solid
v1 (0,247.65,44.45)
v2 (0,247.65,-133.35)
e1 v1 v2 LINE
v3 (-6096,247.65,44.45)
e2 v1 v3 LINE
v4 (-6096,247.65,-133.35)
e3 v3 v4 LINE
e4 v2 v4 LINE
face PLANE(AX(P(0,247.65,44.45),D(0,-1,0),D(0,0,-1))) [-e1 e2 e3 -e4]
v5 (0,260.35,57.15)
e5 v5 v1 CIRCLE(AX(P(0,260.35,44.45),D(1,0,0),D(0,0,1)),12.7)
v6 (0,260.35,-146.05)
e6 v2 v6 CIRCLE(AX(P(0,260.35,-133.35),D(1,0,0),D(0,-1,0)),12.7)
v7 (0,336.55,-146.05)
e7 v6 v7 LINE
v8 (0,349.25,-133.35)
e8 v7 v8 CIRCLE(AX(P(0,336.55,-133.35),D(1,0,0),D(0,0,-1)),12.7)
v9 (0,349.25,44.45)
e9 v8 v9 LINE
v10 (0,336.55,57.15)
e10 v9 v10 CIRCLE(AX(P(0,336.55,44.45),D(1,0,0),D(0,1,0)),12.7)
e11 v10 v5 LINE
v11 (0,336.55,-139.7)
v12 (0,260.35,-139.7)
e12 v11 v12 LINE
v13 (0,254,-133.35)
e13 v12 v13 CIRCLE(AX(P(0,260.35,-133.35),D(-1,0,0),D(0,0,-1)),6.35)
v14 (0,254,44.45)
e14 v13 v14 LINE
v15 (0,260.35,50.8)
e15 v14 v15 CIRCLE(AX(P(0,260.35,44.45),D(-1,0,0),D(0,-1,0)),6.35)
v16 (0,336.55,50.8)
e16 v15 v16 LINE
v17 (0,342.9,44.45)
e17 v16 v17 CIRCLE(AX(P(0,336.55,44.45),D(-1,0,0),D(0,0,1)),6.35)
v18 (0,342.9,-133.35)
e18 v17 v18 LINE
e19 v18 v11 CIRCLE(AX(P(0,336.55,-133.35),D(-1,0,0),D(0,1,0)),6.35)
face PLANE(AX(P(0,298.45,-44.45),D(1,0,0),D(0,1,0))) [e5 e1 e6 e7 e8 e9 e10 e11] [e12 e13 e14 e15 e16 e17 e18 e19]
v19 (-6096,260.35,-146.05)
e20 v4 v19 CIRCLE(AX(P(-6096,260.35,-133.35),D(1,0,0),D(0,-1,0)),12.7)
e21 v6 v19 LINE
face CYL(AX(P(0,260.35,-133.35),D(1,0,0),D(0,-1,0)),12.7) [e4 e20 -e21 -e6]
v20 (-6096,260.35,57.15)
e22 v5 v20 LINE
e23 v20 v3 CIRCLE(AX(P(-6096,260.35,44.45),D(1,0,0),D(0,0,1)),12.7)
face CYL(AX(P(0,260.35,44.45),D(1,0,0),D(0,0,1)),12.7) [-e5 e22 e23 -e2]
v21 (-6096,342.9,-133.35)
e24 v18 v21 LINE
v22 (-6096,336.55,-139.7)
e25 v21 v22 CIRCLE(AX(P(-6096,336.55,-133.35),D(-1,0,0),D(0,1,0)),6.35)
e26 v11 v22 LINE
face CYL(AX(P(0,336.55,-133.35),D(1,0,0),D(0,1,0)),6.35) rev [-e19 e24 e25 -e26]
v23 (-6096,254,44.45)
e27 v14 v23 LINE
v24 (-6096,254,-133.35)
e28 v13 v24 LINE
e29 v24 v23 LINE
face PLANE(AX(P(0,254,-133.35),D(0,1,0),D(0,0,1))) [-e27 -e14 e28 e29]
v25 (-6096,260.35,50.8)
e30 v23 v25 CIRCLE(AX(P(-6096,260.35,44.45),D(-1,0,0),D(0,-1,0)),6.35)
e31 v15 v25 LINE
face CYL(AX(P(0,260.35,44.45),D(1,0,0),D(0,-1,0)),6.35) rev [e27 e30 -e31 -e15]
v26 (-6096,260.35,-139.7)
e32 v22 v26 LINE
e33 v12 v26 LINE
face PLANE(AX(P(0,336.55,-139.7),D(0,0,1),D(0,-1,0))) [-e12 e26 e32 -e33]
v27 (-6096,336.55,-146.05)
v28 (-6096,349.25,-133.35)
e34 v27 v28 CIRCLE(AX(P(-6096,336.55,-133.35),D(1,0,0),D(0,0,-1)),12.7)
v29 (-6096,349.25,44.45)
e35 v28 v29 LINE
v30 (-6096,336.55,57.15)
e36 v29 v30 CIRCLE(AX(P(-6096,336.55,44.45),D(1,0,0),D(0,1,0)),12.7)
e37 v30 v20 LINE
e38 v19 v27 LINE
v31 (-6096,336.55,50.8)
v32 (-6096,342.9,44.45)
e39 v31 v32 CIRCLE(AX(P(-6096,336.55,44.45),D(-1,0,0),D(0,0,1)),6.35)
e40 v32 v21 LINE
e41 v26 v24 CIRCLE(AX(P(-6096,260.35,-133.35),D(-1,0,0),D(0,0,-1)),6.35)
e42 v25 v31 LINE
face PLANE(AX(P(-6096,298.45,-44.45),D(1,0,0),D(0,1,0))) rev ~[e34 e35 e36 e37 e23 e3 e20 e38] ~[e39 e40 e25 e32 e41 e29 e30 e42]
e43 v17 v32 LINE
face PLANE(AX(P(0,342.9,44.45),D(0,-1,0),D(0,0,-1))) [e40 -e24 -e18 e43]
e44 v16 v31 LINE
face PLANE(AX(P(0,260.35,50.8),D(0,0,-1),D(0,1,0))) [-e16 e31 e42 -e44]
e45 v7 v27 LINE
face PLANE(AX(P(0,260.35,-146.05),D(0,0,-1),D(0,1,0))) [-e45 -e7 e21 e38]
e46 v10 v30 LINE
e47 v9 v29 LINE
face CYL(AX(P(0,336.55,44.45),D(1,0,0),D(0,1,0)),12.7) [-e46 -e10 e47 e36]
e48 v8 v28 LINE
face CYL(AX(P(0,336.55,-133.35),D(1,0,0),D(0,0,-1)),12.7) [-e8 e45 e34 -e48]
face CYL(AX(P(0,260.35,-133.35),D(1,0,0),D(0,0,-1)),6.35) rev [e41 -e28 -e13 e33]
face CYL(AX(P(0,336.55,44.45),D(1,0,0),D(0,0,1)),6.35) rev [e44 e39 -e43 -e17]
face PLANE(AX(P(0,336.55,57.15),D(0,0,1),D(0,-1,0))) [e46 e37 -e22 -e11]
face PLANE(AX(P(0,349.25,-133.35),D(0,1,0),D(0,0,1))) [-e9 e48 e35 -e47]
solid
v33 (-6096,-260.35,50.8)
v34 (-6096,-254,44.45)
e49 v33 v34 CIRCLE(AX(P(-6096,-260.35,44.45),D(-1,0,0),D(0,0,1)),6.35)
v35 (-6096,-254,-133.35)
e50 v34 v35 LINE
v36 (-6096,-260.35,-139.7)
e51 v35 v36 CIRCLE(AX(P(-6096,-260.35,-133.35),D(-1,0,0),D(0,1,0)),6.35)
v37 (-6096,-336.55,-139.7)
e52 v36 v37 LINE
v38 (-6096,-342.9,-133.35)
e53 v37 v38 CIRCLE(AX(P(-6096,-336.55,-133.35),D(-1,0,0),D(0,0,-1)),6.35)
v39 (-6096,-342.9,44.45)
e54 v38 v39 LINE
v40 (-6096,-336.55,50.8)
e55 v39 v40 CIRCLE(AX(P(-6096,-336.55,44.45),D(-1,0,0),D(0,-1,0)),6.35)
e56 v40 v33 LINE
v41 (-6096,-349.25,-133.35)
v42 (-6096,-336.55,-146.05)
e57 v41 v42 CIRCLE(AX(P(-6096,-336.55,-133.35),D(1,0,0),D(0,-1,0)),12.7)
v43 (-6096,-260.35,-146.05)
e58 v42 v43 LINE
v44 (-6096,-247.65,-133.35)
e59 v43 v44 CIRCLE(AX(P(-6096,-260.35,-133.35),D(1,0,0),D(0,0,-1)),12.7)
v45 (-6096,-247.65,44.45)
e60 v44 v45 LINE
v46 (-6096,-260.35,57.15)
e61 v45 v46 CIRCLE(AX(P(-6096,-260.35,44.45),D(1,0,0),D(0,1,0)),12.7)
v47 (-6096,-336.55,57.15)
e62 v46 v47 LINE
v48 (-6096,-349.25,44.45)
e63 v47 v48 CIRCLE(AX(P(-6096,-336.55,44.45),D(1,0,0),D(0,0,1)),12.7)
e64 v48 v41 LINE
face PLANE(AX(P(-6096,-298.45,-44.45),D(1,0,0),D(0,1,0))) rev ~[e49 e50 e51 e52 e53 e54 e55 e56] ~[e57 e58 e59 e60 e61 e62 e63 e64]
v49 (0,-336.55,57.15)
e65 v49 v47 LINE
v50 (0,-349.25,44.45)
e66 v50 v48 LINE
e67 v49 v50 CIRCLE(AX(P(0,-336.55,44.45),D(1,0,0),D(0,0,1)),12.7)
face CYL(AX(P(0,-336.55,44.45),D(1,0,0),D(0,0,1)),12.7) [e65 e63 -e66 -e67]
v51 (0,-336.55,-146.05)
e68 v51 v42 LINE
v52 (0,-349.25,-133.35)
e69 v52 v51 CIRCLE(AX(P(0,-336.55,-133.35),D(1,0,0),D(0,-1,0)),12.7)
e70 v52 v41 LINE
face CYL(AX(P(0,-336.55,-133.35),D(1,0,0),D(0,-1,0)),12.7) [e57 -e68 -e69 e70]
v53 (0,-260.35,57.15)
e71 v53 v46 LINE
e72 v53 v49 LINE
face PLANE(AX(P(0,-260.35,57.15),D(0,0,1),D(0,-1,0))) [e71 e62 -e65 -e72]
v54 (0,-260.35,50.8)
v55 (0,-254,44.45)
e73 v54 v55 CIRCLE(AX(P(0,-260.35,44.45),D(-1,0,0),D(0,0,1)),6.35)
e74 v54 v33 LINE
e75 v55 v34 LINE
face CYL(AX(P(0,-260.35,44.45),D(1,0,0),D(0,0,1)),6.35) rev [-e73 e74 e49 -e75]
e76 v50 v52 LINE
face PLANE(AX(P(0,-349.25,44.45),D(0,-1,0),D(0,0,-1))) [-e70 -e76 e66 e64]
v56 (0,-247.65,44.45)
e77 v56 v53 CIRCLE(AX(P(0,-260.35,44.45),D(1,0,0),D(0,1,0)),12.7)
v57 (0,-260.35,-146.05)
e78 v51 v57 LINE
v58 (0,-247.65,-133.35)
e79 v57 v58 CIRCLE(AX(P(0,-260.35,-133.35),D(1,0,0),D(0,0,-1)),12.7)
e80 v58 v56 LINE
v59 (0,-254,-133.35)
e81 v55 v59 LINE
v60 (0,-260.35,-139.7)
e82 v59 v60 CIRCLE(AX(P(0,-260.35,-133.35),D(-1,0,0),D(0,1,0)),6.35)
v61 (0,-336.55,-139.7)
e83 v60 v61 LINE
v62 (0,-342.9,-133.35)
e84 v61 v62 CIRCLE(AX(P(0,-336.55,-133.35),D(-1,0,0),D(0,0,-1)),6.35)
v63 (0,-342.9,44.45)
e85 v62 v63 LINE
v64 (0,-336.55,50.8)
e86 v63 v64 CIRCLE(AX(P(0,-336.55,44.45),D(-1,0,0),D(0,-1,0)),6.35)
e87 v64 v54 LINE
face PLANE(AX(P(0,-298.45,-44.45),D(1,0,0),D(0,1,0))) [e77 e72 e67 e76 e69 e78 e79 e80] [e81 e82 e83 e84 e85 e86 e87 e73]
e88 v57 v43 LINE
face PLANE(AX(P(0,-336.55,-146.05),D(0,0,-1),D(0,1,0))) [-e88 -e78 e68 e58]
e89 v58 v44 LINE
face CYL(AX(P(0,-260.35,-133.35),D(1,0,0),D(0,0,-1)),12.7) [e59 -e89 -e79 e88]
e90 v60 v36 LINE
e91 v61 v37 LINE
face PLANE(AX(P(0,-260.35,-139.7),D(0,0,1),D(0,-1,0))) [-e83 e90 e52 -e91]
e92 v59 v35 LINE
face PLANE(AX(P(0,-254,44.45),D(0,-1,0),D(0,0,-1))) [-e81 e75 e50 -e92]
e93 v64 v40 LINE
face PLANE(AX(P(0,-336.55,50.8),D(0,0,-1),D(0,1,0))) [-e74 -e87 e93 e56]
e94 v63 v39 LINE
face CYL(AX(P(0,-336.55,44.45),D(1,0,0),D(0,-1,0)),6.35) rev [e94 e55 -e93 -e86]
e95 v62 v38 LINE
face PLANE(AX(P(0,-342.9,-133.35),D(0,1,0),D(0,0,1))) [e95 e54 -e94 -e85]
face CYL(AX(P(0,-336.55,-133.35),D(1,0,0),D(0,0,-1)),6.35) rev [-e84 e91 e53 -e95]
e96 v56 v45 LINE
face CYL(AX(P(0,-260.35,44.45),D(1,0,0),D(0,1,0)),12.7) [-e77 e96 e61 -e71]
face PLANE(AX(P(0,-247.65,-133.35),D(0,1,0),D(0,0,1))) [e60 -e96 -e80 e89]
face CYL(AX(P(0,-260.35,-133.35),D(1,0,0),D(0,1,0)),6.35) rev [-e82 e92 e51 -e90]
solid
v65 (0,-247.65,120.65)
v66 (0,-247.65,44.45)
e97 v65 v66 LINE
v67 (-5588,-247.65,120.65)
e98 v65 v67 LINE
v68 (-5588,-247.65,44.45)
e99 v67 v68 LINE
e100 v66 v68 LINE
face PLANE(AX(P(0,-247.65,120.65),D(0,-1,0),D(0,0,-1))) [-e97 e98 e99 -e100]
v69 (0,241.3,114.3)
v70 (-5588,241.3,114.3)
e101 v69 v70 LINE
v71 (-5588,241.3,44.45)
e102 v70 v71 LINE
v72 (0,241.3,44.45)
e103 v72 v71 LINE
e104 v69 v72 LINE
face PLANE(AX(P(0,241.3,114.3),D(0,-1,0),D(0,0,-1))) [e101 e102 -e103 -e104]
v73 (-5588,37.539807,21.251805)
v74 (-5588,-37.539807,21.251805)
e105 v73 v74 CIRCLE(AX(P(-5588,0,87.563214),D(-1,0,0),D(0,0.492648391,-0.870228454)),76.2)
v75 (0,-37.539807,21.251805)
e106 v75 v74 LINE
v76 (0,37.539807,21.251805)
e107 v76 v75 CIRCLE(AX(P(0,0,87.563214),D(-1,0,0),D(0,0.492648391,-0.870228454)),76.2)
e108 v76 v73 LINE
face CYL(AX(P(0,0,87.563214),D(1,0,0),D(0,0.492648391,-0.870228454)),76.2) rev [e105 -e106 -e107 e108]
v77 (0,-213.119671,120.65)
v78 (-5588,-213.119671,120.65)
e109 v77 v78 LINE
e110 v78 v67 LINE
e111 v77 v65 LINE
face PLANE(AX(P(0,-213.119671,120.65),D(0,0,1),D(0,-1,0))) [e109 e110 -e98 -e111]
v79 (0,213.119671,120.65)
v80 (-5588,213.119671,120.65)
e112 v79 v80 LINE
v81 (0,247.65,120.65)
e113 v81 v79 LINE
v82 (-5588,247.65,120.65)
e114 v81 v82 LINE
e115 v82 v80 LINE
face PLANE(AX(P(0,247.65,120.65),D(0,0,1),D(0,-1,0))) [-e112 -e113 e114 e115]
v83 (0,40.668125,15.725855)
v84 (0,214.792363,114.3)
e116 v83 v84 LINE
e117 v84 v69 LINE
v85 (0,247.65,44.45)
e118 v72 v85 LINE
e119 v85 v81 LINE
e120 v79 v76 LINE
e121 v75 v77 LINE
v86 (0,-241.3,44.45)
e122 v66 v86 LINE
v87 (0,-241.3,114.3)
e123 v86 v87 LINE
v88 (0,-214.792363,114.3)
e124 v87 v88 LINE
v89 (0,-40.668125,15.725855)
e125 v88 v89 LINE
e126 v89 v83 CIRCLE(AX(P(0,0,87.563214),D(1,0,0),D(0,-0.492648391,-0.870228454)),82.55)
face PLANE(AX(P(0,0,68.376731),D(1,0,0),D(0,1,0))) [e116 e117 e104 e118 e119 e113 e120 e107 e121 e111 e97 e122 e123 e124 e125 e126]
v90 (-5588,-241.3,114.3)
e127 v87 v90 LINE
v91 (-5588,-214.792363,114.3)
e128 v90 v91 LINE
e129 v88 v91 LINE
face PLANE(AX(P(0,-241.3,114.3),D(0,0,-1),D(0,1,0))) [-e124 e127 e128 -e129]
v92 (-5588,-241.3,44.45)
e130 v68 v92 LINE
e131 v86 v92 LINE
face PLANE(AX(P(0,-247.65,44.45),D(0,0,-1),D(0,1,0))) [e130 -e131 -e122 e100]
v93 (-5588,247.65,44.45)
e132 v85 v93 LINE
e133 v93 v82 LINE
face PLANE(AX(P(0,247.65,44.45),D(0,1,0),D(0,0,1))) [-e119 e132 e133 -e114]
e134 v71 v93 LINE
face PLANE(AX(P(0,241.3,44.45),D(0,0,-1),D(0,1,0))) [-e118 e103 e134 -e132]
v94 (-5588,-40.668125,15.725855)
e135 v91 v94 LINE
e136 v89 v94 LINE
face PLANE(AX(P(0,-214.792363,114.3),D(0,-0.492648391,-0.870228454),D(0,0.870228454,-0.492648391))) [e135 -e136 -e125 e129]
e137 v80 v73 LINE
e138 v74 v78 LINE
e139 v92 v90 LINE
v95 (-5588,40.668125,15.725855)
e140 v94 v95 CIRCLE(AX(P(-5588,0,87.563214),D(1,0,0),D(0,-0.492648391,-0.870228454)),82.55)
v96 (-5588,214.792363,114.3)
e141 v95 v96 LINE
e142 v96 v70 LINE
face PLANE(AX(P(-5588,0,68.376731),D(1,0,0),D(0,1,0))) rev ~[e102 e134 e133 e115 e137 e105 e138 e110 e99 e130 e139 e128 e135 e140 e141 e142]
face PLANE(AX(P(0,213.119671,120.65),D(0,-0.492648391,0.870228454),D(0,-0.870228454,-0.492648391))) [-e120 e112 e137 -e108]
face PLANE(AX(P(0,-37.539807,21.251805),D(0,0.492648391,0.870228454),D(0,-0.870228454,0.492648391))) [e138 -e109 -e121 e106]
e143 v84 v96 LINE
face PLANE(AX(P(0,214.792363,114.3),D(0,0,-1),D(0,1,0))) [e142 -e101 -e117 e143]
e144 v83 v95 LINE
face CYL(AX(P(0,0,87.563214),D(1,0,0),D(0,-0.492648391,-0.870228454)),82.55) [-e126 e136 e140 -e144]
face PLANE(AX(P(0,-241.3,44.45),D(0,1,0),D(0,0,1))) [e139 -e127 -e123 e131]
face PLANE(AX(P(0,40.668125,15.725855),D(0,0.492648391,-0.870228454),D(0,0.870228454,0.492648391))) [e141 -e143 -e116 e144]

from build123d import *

# Parameters (mm, degrees)
F1_DEPTH = 6096
F2_DEPTH = 5588


# Not quite as in the source:
# - a feature names something its author has since deleted; it is built from what else it names


with BuildPart() as f1:
    # F0 (on Right) → F1 (new body)
    with BuildSketch(Plane.YZ):
        with BuildLine():
            Line((-278.751844046, 57.15), (-336.55, 57.15))
            ThreePointArc((-336.55, 57.15), (-345.5302561211, 53.4302561211), (-349.25, 44.45))
            Line((-349.25, 44.45), (-349.25, -133.35))
            ThreePointArc((-349.25, -133.35), (-345.5302561211, -142.3302561211), (-336.55, -146.05))
            Line((-336.55, -146.05), (-260.35, -146.05))
            ThreePointArc((-260.35, -146.05), (-251.3697438789, -142.3302561211), (-247.65, -133.35))
            Line((-247.65, -133.35), (-247.65, 44.45))
            ThreePointArc((-247.65, 44.45), (-251.3697438789, 53.4302561211), (-260.35, 57.15))
            Line((-260.35, 57.15), (-268.1402802436, 57.15))
            Line((-268.1402802436, 57.15), (-269.3472818438, 57.15))
            Line((-269.3472818438, 57.15), (-278.751844046, 57.15))
        make_face()
        with BuildLine():
            ThreePointArc((-342.9, 44.45), (-341.0401280605, 48.9401280605), (-336.55, 50.8))
            Line((-336.55, 50.8), (-260.35, 50.8))
            ThreePointArc((-260.35, 50.8), (-255.8598719395, 48.9401280605), (-254, 44.45))
            Line((-254, 44.45), (-254, -133.35))
            ThreePointArc((-254, -133.35), (-255.8598719395, -137.8401280605), (-260.35, -139.7))
            Line((-260.35, -139.7), (-336.55, -139.7))
            ThreePointArc((-336.55, -139.7), (-341.0401280605, -137.8401280605), (-342.9, -133.35))
            Line((-342.9, -133.35), (-342.9, 44.45))
        make_face(mode=Mode.SUBTRACT)
    extrude(amount=-F1_DEPTH)


with BuildPart() as f1b:
    # F0 (on Right) → F1, piece 2 (new body)
    with BuildSketch(Plane.YZ):
        with BuildLine():
            ThreePointArc((260.35, 57.15), (251.3697438789, 53.4302561211), (247.65, 44.45))
            Line((247.65, 44.45), (247.65, -133.35))
            ThreePointArc((247.65, -133.35), (251.3697438789, -142.3302561211), (260.35, -146.05))
            Line((260.35, -146.05), (336.55, -146.05))
            ThreePointArc((336.55, -146.05), (345.5302561211, -142.3302561211), (349.25, -133.35))
            Line((349.25, -133.35), (349.25, 44.45))
            ThreePointArc((349.25, 44.45), (345.5302561211, 53.4302561211), (336.55, 57.15))
            Line((336.55, 57.15), (260.35, 57.15))
        make_face()
        with BuildLine():
            Line((260.35, 50.8), (336.55, 50.8))
            ThreePointArc((336.55, 50.8), (341.0401280605, 48.9401280605), (342.9, 44.45))
            Line((342.9, 44.45), (342.9, -133.35))
            ThreePointArc((342.9, -133.35), (341.0401280605, -137.8401280605), (336.55, -139.7))
            Line((336.55, -139.7), (260.35, -139.7))
            ThreePointArc((260.35, -139.7), (255.8598719395, -137.8401280605), (254, -133.35))
            Line((254, -133.35), (254, 44.45))
            ThreePointArc((254, 44.45), (255.8598719395, 48.9401280605), (260.35, 50.8))
        make_face(mode=Mode.SUBTRACT)
    extrude(amount=-F1_DEPTH)


with BuildPart() as f2:
    # F0 (on Right) → F2 (new body)
    with BuildSketch(Plane.YZ):
        with BuildLine():
            Line((-247.65, 120.65), (-247.65, 44.45))
            Line((-247.65, 44.45), (-241.3, 44.45))
            Line((-241.3, 44.45), (-241.3, 114.3))
            Line((-241.3, 114.3), (-214.7923633436, 114.3))
            Line((-214.7923633436, 114.3), (-40.6681247176, 15.7258547021))
            ThreePointArc((-40.6681247176, 15.7258547021), (0, 5.0132135897), (40.6681247176, 15.7258547021))
            Line((40.6681247176, 15.7258547021), (214.7923633436, 114.3))
            Line((214.7923633436, 114.3), (241.3, 114.3))
            Line((241.3, 114.3), (241.3, 44.45))
            Line((241.3, 44.45), (247.65, 44.45))
            Line((247.65, 44.45), (247.65, 120.65))
            Line((247.65, 120.65), (213.1196707487, 120.65))
            Line((213.1196707487, 120.65), (37.5398074317, 21.2518053858))
            ThreePointArc((37.5398074317, 21.2518053858), (0, 11.3632135897), (-37.5398074317, 21.2518053858))
            Line((-37.5398074317, 21.2518053858), (-213.1196707487, 120.65))
            Line((-213.1196707487, 120.65), (-247.65, 120.65))
        make_face()
    extrude(amount=-F2_DEPTH)


solid = Compound([f1.part, f1b.part, f2.part])
